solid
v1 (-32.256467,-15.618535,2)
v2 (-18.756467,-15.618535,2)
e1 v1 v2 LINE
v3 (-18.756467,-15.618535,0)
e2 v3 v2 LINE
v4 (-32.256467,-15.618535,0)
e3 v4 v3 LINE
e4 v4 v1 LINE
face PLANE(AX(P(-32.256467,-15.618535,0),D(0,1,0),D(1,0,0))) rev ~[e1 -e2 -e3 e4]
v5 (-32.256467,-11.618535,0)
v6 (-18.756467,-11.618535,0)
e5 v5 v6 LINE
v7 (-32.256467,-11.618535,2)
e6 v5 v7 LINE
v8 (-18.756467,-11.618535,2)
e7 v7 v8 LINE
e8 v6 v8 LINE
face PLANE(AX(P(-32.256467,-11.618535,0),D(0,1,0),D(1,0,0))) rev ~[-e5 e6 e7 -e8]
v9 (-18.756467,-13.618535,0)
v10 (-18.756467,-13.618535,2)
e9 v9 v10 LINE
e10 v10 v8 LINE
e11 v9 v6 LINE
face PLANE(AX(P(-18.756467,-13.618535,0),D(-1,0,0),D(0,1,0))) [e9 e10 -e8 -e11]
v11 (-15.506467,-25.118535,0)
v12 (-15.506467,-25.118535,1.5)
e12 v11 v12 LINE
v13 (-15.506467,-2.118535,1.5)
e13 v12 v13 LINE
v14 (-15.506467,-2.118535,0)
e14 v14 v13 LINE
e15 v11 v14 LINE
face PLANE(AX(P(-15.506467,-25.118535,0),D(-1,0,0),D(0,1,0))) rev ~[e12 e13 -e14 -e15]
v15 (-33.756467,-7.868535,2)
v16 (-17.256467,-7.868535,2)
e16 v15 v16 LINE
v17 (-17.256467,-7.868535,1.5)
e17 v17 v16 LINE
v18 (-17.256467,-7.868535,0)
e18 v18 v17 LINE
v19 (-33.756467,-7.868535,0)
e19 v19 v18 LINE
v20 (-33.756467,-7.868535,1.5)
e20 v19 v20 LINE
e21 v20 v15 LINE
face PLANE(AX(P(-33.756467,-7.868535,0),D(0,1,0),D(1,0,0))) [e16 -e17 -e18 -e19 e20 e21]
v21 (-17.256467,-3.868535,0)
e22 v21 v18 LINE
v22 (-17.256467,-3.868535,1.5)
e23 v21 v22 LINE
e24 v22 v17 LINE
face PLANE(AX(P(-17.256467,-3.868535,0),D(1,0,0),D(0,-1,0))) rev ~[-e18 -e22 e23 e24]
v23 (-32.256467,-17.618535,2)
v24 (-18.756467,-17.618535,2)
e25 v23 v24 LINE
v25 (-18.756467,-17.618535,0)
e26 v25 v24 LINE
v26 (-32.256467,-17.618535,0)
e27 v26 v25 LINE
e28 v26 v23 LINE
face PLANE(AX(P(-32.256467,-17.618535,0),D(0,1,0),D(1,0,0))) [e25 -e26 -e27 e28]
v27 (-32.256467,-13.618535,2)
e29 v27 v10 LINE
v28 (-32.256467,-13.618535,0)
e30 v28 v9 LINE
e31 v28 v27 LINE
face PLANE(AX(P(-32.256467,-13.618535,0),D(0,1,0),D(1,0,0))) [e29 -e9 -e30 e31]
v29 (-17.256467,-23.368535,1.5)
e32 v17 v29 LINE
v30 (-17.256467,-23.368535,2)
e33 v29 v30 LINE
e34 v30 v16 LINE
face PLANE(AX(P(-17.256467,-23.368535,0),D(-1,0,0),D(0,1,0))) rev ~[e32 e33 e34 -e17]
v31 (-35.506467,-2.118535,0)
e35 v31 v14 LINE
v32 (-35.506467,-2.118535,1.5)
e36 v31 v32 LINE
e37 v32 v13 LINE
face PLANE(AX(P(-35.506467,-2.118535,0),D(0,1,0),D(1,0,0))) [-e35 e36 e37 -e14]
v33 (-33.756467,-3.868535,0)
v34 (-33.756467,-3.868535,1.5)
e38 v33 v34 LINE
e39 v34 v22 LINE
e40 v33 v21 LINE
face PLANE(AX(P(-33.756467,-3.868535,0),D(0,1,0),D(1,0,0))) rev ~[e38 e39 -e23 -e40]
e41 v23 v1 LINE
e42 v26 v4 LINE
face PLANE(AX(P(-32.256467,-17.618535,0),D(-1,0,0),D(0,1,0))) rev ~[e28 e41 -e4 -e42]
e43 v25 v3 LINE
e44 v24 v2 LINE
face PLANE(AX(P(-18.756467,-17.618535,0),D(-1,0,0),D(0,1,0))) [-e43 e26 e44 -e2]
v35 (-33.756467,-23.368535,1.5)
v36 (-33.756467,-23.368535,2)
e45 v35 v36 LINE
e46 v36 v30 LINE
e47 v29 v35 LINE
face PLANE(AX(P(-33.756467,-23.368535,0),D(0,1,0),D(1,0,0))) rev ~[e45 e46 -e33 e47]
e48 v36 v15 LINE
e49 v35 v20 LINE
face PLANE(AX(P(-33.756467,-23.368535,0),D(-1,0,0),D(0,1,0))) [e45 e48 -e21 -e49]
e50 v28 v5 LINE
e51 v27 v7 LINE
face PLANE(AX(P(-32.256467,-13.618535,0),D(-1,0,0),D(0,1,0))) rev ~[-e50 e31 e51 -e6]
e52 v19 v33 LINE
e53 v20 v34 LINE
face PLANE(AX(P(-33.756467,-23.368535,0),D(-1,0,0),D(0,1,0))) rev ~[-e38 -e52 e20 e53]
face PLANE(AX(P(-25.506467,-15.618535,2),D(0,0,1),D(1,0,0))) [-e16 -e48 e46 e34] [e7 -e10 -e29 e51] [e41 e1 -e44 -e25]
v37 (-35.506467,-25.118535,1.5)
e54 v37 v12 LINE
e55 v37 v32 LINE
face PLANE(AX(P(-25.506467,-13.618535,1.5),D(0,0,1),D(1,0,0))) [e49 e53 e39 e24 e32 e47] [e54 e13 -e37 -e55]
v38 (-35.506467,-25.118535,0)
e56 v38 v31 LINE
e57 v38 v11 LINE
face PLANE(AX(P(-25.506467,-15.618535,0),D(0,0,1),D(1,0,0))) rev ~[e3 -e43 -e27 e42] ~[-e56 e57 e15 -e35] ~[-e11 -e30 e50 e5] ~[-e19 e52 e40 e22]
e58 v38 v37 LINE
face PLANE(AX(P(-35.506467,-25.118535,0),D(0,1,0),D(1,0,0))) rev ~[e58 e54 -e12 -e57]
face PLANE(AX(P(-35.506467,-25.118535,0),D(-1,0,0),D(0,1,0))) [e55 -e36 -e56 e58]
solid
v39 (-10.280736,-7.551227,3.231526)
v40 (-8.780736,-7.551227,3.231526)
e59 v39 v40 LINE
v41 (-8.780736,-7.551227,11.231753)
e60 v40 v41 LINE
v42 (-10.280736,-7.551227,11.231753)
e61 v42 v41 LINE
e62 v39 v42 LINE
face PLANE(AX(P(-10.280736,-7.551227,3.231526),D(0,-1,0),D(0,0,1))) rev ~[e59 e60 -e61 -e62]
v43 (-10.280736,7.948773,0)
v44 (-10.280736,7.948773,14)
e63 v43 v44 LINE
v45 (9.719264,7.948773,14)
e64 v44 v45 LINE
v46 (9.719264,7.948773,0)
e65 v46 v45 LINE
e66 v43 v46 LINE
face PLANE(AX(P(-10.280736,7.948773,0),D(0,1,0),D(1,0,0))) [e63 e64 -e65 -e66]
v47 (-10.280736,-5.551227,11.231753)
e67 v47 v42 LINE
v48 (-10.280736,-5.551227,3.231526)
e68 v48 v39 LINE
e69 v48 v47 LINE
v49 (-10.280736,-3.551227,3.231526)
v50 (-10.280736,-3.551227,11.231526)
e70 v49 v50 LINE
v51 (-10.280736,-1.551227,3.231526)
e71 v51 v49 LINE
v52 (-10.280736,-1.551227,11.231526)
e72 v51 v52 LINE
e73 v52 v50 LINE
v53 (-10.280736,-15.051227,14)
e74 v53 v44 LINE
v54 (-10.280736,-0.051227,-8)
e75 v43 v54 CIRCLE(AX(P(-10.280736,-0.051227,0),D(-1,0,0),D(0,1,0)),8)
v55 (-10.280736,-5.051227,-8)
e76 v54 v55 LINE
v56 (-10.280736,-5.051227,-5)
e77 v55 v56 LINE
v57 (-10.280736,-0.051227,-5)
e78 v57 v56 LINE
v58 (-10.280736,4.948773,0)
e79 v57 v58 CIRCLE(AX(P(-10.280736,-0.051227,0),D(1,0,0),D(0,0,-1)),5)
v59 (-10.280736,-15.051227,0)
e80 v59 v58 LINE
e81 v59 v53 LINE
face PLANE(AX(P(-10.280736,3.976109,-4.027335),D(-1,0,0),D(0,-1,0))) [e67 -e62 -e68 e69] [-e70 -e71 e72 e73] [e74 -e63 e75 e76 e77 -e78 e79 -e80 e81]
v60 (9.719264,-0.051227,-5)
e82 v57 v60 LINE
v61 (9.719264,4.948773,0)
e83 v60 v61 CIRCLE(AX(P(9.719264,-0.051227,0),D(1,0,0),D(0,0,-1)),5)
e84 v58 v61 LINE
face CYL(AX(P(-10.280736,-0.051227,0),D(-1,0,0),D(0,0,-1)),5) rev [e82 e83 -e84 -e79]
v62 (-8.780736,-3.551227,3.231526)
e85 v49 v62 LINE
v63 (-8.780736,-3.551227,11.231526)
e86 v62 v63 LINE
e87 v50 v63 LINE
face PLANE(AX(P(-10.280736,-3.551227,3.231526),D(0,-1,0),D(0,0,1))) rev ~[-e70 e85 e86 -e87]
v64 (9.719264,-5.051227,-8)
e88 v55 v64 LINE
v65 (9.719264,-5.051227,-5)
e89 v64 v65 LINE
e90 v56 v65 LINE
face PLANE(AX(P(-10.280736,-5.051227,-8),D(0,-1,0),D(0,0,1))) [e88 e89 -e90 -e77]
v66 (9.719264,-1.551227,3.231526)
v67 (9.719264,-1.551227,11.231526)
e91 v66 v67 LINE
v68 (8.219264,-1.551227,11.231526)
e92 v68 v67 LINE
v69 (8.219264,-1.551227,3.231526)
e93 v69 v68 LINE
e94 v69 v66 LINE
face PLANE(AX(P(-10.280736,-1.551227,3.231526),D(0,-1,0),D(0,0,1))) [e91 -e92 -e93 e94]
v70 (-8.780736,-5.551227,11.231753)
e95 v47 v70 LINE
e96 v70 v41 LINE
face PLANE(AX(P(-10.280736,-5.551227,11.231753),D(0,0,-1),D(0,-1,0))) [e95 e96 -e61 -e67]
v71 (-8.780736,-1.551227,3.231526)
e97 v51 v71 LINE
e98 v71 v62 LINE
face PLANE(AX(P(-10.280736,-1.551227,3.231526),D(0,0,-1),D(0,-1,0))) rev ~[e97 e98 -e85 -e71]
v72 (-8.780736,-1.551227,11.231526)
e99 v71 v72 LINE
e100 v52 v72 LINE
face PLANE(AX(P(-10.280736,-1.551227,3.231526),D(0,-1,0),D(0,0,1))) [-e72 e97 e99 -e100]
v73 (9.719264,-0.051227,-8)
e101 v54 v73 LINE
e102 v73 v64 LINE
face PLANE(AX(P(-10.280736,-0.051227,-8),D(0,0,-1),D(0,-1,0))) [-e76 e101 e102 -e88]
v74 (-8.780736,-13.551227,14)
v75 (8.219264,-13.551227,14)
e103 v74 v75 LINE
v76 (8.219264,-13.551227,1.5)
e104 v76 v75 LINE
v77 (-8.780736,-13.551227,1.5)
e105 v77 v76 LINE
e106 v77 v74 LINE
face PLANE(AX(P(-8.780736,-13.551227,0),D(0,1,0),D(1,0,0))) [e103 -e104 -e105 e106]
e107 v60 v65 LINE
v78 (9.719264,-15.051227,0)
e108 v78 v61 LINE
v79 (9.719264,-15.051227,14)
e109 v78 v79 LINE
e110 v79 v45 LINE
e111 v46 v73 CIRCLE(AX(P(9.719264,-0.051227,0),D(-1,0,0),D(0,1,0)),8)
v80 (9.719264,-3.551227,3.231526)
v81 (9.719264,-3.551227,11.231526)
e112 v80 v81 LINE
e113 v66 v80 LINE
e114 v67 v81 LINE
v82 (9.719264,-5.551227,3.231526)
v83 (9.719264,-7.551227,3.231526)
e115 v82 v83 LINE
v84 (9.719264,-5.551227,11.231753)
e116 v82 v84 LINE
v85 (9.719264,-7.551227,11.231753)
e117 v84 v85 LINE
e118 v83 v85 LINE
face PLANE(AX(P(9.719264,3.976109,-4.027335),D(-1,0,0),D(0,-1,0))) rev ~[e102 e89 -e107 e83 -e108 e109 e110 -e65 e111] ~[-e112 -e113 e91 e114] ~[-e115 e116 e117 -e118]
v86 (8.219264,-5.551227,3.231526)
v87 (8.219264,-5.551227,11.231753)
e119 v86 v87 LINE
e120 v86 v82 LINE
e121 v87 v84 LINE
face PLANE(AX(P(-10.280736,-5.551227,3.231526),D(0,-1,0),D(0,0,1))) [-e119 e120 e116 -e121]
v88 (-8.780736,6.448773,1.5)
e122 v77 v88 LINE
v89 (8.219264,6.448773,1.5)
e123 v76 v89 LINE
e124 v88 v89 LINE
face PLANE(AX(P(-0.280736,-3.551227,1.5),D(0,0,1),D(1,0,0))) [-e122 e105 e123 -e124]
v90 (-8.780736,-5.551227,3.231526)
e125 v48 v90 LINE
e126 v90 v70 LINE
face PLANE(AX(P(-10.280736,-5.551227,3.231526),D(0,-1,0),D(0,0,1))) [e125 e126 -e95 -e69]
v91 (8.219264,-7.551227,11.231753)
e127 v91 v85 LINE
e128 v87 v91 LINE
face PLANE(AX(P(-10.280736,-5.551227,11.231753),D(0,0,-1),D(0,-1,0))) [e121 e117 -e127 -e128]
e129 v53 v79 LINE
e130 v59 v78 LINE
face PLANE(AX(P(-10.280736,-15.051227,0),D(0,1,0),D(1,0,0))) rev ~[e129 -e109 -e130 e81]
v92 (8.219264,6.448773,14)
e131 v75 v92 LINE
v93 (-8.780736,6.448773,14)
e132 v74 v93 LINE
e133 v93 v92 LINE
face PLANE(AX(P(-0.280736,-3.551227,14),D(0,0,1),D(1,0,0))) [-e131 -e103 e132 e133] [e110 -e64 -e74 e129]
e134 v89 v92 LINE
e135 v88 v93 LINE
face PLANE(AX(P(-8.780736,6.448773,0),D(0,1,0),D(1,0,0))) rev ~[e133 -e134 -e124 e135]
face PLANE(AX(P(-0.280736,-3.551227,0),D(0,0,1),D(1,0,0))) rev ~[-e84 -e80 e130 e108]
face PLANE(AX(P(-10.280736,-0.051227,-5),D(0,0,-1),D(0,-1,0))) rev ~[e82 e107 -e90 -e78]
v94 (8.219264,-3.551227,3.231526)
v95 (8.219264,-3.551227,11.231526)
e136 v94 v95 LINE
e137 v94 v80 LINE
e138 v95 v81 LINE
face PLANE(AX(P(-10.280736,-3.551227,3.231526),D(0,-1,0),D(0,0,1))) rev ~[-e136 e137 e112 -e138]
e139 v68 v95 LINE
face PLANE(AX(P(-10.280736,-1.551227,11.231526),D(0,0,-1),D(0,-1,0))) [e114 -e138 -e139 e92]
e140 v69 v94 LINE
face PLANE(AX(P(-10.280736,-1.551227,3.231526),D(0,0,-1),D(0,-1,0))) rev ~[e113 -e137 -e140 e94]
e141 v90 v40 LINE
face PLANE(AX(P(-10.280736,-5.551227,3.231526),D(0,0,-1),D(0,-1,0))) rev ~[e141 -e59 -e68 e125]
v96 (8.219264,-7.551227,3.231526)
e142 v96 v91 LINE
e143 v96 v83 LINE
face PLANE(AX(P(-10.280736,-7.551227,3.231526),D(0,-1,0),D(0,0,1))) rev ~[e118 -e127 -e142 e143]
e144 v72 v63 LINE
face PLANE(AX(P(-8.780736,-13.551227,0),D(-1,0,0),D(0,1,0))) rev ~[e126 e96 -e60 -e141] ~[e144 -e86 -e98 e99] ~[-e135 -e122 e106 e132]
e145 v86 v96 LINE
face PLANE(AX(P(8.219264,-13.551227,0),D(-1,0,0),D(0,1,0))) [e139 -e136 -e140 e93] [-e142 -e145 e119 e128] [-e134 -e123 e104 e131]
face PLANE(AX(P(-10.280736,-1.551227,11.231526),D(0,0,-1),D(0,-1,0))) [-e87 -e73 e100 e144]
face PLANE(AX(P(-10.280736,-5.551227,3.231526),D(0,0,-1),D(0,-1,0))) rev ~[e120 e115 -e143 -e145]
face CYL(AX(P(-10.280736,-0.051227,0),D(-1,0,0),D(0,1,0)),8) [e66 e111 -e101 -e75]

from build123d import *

# Parameters (mm, degrees)
F0_W     = 20
F0_H     = 23
F0_W_2   = 17
F0_H_2   = 20
F1_DEPTH = 14
F2_DEPTH = 1.5
F3_W     = 20
F3_H     = 23
F4_DEPTH = 1.5
F3_W_2   = 16.5
F3_H_2   = 15.5
F3_W_3   = 13.5
F3_H_3   = 2
F5_DEPTH = 2
F6_W     = 2
F6_H     = 8
F6_H_2   = 8.00022727
F7_DEPTH = 25
F8_W     = 5
F8_H     = 3
F9_DEPTH = 20


# Not quite as in the source:
# - a feature names something its author has since deleted; it is built from what else it names


with BuildPart() as f1:
    # F0 (on Top) → F1 (new body)
    with BuildSketch(Plane.XY):
        with Locations((-0.2807364799, -3.5512268197)):
            Rectangle(F0_W, F0_H)
        with Locations((-0.2807364799, -3.5512268197)):
            Rectangle(F0_W_2, F0_H_2, mode=Mode.SUBTRACT)
    extrude(amount=F1_DEPTH)

    # F0 (on Top) → F2 (join)
    with BuildSketch(Plane.XY):
        with Locations((-0.2807364799, -3.5512268197)):
            Rectangle(F0_W_2, F0_H_2)
    extrude(amount=F2_DEPTH)

    # F6 (on face) → F7 (cut)
    with BuildSketch(Plane(origin=(-10.2807364799, 0, 0), x_dir=(0, -1, 0), z_dir=(-1, 0, 0))):
        with Locations((2.5512268197, 7.2315260049)):
            Rectangle(F6_W, F6_H)
        with Locations((6.5512268197, 7.2316396399)):
            Rectangle(F6_W, F6_H_2)
    extrude(amount=-F7_DEPTH, mode=Mode.SUBTRACT)

    # F8 (on face) → F9 (join)
    with BuildSketch(Plane(origin=(-10.2807364799, 0, 0), x_dir=(0, -1, 0), z_dir=(-1, 0, 0))):
        with BuildLine():
            ThreePointArc((0.0512268197, -5), (-3.4843070863, -3.5355339059), (-4.9487731803, 0))
            Line((-4.9487731803, 0), (-7.9487731803, 0))
            ThreePointArc((-7.9487731803, 0), (-5.6056274298, -5.6568542495), (0.0512268197, -8))
            Line((0.0512268197, -8), (0.0512268197, -5))
        make_face()
        with Locations((2.5512268197, -6.5)):
            Rectangle(F8_W, F8_H)
    extrude(amount=-F9_DEPTH)


with BuildPart() as f4:
    # F3 (on Top) → F4 (new body)
    with BuildSketch(Plane.XY):
        with Locations((-25.5064666271, -13.6185353845)):
            Rectangle(F3_W, F3_H)
        Polygon((-33.7564666271, -7.8685353845), (-33.7564666271, -3.8685353845), (-17.2564666271, -3.8685353845), (-17.2564666271, -7.8685353845), (-17.2564666271, -23.3685353845), (-33.7564666271, -23.3685353845), align=None, mode=Mode.SUBTRACT)
    extrude(amount=F4_DEPTH)

    # F3 (on Top) → F5 (join)
    with BuildSketch(Plane.XY):
        with Locations((-25.5064666271, -15.6185353845)):
            Rectangle(F3_W_2, F3_H_2)
        with Locations((-25.5064666271, -16.6185353845)):
            Rectangle(F3_W_3, F3_H_3, mode=Mode.SUBTRACT)
        with Locations((-25.5064666271, -12.6185353845)):
            Rectangle(F3_W_3, F3_H_3, mode=Mode.SUBTRACT)
    extrude(amount=F5_DEPTH)


solid = Compound([f1.part, f4.part])
